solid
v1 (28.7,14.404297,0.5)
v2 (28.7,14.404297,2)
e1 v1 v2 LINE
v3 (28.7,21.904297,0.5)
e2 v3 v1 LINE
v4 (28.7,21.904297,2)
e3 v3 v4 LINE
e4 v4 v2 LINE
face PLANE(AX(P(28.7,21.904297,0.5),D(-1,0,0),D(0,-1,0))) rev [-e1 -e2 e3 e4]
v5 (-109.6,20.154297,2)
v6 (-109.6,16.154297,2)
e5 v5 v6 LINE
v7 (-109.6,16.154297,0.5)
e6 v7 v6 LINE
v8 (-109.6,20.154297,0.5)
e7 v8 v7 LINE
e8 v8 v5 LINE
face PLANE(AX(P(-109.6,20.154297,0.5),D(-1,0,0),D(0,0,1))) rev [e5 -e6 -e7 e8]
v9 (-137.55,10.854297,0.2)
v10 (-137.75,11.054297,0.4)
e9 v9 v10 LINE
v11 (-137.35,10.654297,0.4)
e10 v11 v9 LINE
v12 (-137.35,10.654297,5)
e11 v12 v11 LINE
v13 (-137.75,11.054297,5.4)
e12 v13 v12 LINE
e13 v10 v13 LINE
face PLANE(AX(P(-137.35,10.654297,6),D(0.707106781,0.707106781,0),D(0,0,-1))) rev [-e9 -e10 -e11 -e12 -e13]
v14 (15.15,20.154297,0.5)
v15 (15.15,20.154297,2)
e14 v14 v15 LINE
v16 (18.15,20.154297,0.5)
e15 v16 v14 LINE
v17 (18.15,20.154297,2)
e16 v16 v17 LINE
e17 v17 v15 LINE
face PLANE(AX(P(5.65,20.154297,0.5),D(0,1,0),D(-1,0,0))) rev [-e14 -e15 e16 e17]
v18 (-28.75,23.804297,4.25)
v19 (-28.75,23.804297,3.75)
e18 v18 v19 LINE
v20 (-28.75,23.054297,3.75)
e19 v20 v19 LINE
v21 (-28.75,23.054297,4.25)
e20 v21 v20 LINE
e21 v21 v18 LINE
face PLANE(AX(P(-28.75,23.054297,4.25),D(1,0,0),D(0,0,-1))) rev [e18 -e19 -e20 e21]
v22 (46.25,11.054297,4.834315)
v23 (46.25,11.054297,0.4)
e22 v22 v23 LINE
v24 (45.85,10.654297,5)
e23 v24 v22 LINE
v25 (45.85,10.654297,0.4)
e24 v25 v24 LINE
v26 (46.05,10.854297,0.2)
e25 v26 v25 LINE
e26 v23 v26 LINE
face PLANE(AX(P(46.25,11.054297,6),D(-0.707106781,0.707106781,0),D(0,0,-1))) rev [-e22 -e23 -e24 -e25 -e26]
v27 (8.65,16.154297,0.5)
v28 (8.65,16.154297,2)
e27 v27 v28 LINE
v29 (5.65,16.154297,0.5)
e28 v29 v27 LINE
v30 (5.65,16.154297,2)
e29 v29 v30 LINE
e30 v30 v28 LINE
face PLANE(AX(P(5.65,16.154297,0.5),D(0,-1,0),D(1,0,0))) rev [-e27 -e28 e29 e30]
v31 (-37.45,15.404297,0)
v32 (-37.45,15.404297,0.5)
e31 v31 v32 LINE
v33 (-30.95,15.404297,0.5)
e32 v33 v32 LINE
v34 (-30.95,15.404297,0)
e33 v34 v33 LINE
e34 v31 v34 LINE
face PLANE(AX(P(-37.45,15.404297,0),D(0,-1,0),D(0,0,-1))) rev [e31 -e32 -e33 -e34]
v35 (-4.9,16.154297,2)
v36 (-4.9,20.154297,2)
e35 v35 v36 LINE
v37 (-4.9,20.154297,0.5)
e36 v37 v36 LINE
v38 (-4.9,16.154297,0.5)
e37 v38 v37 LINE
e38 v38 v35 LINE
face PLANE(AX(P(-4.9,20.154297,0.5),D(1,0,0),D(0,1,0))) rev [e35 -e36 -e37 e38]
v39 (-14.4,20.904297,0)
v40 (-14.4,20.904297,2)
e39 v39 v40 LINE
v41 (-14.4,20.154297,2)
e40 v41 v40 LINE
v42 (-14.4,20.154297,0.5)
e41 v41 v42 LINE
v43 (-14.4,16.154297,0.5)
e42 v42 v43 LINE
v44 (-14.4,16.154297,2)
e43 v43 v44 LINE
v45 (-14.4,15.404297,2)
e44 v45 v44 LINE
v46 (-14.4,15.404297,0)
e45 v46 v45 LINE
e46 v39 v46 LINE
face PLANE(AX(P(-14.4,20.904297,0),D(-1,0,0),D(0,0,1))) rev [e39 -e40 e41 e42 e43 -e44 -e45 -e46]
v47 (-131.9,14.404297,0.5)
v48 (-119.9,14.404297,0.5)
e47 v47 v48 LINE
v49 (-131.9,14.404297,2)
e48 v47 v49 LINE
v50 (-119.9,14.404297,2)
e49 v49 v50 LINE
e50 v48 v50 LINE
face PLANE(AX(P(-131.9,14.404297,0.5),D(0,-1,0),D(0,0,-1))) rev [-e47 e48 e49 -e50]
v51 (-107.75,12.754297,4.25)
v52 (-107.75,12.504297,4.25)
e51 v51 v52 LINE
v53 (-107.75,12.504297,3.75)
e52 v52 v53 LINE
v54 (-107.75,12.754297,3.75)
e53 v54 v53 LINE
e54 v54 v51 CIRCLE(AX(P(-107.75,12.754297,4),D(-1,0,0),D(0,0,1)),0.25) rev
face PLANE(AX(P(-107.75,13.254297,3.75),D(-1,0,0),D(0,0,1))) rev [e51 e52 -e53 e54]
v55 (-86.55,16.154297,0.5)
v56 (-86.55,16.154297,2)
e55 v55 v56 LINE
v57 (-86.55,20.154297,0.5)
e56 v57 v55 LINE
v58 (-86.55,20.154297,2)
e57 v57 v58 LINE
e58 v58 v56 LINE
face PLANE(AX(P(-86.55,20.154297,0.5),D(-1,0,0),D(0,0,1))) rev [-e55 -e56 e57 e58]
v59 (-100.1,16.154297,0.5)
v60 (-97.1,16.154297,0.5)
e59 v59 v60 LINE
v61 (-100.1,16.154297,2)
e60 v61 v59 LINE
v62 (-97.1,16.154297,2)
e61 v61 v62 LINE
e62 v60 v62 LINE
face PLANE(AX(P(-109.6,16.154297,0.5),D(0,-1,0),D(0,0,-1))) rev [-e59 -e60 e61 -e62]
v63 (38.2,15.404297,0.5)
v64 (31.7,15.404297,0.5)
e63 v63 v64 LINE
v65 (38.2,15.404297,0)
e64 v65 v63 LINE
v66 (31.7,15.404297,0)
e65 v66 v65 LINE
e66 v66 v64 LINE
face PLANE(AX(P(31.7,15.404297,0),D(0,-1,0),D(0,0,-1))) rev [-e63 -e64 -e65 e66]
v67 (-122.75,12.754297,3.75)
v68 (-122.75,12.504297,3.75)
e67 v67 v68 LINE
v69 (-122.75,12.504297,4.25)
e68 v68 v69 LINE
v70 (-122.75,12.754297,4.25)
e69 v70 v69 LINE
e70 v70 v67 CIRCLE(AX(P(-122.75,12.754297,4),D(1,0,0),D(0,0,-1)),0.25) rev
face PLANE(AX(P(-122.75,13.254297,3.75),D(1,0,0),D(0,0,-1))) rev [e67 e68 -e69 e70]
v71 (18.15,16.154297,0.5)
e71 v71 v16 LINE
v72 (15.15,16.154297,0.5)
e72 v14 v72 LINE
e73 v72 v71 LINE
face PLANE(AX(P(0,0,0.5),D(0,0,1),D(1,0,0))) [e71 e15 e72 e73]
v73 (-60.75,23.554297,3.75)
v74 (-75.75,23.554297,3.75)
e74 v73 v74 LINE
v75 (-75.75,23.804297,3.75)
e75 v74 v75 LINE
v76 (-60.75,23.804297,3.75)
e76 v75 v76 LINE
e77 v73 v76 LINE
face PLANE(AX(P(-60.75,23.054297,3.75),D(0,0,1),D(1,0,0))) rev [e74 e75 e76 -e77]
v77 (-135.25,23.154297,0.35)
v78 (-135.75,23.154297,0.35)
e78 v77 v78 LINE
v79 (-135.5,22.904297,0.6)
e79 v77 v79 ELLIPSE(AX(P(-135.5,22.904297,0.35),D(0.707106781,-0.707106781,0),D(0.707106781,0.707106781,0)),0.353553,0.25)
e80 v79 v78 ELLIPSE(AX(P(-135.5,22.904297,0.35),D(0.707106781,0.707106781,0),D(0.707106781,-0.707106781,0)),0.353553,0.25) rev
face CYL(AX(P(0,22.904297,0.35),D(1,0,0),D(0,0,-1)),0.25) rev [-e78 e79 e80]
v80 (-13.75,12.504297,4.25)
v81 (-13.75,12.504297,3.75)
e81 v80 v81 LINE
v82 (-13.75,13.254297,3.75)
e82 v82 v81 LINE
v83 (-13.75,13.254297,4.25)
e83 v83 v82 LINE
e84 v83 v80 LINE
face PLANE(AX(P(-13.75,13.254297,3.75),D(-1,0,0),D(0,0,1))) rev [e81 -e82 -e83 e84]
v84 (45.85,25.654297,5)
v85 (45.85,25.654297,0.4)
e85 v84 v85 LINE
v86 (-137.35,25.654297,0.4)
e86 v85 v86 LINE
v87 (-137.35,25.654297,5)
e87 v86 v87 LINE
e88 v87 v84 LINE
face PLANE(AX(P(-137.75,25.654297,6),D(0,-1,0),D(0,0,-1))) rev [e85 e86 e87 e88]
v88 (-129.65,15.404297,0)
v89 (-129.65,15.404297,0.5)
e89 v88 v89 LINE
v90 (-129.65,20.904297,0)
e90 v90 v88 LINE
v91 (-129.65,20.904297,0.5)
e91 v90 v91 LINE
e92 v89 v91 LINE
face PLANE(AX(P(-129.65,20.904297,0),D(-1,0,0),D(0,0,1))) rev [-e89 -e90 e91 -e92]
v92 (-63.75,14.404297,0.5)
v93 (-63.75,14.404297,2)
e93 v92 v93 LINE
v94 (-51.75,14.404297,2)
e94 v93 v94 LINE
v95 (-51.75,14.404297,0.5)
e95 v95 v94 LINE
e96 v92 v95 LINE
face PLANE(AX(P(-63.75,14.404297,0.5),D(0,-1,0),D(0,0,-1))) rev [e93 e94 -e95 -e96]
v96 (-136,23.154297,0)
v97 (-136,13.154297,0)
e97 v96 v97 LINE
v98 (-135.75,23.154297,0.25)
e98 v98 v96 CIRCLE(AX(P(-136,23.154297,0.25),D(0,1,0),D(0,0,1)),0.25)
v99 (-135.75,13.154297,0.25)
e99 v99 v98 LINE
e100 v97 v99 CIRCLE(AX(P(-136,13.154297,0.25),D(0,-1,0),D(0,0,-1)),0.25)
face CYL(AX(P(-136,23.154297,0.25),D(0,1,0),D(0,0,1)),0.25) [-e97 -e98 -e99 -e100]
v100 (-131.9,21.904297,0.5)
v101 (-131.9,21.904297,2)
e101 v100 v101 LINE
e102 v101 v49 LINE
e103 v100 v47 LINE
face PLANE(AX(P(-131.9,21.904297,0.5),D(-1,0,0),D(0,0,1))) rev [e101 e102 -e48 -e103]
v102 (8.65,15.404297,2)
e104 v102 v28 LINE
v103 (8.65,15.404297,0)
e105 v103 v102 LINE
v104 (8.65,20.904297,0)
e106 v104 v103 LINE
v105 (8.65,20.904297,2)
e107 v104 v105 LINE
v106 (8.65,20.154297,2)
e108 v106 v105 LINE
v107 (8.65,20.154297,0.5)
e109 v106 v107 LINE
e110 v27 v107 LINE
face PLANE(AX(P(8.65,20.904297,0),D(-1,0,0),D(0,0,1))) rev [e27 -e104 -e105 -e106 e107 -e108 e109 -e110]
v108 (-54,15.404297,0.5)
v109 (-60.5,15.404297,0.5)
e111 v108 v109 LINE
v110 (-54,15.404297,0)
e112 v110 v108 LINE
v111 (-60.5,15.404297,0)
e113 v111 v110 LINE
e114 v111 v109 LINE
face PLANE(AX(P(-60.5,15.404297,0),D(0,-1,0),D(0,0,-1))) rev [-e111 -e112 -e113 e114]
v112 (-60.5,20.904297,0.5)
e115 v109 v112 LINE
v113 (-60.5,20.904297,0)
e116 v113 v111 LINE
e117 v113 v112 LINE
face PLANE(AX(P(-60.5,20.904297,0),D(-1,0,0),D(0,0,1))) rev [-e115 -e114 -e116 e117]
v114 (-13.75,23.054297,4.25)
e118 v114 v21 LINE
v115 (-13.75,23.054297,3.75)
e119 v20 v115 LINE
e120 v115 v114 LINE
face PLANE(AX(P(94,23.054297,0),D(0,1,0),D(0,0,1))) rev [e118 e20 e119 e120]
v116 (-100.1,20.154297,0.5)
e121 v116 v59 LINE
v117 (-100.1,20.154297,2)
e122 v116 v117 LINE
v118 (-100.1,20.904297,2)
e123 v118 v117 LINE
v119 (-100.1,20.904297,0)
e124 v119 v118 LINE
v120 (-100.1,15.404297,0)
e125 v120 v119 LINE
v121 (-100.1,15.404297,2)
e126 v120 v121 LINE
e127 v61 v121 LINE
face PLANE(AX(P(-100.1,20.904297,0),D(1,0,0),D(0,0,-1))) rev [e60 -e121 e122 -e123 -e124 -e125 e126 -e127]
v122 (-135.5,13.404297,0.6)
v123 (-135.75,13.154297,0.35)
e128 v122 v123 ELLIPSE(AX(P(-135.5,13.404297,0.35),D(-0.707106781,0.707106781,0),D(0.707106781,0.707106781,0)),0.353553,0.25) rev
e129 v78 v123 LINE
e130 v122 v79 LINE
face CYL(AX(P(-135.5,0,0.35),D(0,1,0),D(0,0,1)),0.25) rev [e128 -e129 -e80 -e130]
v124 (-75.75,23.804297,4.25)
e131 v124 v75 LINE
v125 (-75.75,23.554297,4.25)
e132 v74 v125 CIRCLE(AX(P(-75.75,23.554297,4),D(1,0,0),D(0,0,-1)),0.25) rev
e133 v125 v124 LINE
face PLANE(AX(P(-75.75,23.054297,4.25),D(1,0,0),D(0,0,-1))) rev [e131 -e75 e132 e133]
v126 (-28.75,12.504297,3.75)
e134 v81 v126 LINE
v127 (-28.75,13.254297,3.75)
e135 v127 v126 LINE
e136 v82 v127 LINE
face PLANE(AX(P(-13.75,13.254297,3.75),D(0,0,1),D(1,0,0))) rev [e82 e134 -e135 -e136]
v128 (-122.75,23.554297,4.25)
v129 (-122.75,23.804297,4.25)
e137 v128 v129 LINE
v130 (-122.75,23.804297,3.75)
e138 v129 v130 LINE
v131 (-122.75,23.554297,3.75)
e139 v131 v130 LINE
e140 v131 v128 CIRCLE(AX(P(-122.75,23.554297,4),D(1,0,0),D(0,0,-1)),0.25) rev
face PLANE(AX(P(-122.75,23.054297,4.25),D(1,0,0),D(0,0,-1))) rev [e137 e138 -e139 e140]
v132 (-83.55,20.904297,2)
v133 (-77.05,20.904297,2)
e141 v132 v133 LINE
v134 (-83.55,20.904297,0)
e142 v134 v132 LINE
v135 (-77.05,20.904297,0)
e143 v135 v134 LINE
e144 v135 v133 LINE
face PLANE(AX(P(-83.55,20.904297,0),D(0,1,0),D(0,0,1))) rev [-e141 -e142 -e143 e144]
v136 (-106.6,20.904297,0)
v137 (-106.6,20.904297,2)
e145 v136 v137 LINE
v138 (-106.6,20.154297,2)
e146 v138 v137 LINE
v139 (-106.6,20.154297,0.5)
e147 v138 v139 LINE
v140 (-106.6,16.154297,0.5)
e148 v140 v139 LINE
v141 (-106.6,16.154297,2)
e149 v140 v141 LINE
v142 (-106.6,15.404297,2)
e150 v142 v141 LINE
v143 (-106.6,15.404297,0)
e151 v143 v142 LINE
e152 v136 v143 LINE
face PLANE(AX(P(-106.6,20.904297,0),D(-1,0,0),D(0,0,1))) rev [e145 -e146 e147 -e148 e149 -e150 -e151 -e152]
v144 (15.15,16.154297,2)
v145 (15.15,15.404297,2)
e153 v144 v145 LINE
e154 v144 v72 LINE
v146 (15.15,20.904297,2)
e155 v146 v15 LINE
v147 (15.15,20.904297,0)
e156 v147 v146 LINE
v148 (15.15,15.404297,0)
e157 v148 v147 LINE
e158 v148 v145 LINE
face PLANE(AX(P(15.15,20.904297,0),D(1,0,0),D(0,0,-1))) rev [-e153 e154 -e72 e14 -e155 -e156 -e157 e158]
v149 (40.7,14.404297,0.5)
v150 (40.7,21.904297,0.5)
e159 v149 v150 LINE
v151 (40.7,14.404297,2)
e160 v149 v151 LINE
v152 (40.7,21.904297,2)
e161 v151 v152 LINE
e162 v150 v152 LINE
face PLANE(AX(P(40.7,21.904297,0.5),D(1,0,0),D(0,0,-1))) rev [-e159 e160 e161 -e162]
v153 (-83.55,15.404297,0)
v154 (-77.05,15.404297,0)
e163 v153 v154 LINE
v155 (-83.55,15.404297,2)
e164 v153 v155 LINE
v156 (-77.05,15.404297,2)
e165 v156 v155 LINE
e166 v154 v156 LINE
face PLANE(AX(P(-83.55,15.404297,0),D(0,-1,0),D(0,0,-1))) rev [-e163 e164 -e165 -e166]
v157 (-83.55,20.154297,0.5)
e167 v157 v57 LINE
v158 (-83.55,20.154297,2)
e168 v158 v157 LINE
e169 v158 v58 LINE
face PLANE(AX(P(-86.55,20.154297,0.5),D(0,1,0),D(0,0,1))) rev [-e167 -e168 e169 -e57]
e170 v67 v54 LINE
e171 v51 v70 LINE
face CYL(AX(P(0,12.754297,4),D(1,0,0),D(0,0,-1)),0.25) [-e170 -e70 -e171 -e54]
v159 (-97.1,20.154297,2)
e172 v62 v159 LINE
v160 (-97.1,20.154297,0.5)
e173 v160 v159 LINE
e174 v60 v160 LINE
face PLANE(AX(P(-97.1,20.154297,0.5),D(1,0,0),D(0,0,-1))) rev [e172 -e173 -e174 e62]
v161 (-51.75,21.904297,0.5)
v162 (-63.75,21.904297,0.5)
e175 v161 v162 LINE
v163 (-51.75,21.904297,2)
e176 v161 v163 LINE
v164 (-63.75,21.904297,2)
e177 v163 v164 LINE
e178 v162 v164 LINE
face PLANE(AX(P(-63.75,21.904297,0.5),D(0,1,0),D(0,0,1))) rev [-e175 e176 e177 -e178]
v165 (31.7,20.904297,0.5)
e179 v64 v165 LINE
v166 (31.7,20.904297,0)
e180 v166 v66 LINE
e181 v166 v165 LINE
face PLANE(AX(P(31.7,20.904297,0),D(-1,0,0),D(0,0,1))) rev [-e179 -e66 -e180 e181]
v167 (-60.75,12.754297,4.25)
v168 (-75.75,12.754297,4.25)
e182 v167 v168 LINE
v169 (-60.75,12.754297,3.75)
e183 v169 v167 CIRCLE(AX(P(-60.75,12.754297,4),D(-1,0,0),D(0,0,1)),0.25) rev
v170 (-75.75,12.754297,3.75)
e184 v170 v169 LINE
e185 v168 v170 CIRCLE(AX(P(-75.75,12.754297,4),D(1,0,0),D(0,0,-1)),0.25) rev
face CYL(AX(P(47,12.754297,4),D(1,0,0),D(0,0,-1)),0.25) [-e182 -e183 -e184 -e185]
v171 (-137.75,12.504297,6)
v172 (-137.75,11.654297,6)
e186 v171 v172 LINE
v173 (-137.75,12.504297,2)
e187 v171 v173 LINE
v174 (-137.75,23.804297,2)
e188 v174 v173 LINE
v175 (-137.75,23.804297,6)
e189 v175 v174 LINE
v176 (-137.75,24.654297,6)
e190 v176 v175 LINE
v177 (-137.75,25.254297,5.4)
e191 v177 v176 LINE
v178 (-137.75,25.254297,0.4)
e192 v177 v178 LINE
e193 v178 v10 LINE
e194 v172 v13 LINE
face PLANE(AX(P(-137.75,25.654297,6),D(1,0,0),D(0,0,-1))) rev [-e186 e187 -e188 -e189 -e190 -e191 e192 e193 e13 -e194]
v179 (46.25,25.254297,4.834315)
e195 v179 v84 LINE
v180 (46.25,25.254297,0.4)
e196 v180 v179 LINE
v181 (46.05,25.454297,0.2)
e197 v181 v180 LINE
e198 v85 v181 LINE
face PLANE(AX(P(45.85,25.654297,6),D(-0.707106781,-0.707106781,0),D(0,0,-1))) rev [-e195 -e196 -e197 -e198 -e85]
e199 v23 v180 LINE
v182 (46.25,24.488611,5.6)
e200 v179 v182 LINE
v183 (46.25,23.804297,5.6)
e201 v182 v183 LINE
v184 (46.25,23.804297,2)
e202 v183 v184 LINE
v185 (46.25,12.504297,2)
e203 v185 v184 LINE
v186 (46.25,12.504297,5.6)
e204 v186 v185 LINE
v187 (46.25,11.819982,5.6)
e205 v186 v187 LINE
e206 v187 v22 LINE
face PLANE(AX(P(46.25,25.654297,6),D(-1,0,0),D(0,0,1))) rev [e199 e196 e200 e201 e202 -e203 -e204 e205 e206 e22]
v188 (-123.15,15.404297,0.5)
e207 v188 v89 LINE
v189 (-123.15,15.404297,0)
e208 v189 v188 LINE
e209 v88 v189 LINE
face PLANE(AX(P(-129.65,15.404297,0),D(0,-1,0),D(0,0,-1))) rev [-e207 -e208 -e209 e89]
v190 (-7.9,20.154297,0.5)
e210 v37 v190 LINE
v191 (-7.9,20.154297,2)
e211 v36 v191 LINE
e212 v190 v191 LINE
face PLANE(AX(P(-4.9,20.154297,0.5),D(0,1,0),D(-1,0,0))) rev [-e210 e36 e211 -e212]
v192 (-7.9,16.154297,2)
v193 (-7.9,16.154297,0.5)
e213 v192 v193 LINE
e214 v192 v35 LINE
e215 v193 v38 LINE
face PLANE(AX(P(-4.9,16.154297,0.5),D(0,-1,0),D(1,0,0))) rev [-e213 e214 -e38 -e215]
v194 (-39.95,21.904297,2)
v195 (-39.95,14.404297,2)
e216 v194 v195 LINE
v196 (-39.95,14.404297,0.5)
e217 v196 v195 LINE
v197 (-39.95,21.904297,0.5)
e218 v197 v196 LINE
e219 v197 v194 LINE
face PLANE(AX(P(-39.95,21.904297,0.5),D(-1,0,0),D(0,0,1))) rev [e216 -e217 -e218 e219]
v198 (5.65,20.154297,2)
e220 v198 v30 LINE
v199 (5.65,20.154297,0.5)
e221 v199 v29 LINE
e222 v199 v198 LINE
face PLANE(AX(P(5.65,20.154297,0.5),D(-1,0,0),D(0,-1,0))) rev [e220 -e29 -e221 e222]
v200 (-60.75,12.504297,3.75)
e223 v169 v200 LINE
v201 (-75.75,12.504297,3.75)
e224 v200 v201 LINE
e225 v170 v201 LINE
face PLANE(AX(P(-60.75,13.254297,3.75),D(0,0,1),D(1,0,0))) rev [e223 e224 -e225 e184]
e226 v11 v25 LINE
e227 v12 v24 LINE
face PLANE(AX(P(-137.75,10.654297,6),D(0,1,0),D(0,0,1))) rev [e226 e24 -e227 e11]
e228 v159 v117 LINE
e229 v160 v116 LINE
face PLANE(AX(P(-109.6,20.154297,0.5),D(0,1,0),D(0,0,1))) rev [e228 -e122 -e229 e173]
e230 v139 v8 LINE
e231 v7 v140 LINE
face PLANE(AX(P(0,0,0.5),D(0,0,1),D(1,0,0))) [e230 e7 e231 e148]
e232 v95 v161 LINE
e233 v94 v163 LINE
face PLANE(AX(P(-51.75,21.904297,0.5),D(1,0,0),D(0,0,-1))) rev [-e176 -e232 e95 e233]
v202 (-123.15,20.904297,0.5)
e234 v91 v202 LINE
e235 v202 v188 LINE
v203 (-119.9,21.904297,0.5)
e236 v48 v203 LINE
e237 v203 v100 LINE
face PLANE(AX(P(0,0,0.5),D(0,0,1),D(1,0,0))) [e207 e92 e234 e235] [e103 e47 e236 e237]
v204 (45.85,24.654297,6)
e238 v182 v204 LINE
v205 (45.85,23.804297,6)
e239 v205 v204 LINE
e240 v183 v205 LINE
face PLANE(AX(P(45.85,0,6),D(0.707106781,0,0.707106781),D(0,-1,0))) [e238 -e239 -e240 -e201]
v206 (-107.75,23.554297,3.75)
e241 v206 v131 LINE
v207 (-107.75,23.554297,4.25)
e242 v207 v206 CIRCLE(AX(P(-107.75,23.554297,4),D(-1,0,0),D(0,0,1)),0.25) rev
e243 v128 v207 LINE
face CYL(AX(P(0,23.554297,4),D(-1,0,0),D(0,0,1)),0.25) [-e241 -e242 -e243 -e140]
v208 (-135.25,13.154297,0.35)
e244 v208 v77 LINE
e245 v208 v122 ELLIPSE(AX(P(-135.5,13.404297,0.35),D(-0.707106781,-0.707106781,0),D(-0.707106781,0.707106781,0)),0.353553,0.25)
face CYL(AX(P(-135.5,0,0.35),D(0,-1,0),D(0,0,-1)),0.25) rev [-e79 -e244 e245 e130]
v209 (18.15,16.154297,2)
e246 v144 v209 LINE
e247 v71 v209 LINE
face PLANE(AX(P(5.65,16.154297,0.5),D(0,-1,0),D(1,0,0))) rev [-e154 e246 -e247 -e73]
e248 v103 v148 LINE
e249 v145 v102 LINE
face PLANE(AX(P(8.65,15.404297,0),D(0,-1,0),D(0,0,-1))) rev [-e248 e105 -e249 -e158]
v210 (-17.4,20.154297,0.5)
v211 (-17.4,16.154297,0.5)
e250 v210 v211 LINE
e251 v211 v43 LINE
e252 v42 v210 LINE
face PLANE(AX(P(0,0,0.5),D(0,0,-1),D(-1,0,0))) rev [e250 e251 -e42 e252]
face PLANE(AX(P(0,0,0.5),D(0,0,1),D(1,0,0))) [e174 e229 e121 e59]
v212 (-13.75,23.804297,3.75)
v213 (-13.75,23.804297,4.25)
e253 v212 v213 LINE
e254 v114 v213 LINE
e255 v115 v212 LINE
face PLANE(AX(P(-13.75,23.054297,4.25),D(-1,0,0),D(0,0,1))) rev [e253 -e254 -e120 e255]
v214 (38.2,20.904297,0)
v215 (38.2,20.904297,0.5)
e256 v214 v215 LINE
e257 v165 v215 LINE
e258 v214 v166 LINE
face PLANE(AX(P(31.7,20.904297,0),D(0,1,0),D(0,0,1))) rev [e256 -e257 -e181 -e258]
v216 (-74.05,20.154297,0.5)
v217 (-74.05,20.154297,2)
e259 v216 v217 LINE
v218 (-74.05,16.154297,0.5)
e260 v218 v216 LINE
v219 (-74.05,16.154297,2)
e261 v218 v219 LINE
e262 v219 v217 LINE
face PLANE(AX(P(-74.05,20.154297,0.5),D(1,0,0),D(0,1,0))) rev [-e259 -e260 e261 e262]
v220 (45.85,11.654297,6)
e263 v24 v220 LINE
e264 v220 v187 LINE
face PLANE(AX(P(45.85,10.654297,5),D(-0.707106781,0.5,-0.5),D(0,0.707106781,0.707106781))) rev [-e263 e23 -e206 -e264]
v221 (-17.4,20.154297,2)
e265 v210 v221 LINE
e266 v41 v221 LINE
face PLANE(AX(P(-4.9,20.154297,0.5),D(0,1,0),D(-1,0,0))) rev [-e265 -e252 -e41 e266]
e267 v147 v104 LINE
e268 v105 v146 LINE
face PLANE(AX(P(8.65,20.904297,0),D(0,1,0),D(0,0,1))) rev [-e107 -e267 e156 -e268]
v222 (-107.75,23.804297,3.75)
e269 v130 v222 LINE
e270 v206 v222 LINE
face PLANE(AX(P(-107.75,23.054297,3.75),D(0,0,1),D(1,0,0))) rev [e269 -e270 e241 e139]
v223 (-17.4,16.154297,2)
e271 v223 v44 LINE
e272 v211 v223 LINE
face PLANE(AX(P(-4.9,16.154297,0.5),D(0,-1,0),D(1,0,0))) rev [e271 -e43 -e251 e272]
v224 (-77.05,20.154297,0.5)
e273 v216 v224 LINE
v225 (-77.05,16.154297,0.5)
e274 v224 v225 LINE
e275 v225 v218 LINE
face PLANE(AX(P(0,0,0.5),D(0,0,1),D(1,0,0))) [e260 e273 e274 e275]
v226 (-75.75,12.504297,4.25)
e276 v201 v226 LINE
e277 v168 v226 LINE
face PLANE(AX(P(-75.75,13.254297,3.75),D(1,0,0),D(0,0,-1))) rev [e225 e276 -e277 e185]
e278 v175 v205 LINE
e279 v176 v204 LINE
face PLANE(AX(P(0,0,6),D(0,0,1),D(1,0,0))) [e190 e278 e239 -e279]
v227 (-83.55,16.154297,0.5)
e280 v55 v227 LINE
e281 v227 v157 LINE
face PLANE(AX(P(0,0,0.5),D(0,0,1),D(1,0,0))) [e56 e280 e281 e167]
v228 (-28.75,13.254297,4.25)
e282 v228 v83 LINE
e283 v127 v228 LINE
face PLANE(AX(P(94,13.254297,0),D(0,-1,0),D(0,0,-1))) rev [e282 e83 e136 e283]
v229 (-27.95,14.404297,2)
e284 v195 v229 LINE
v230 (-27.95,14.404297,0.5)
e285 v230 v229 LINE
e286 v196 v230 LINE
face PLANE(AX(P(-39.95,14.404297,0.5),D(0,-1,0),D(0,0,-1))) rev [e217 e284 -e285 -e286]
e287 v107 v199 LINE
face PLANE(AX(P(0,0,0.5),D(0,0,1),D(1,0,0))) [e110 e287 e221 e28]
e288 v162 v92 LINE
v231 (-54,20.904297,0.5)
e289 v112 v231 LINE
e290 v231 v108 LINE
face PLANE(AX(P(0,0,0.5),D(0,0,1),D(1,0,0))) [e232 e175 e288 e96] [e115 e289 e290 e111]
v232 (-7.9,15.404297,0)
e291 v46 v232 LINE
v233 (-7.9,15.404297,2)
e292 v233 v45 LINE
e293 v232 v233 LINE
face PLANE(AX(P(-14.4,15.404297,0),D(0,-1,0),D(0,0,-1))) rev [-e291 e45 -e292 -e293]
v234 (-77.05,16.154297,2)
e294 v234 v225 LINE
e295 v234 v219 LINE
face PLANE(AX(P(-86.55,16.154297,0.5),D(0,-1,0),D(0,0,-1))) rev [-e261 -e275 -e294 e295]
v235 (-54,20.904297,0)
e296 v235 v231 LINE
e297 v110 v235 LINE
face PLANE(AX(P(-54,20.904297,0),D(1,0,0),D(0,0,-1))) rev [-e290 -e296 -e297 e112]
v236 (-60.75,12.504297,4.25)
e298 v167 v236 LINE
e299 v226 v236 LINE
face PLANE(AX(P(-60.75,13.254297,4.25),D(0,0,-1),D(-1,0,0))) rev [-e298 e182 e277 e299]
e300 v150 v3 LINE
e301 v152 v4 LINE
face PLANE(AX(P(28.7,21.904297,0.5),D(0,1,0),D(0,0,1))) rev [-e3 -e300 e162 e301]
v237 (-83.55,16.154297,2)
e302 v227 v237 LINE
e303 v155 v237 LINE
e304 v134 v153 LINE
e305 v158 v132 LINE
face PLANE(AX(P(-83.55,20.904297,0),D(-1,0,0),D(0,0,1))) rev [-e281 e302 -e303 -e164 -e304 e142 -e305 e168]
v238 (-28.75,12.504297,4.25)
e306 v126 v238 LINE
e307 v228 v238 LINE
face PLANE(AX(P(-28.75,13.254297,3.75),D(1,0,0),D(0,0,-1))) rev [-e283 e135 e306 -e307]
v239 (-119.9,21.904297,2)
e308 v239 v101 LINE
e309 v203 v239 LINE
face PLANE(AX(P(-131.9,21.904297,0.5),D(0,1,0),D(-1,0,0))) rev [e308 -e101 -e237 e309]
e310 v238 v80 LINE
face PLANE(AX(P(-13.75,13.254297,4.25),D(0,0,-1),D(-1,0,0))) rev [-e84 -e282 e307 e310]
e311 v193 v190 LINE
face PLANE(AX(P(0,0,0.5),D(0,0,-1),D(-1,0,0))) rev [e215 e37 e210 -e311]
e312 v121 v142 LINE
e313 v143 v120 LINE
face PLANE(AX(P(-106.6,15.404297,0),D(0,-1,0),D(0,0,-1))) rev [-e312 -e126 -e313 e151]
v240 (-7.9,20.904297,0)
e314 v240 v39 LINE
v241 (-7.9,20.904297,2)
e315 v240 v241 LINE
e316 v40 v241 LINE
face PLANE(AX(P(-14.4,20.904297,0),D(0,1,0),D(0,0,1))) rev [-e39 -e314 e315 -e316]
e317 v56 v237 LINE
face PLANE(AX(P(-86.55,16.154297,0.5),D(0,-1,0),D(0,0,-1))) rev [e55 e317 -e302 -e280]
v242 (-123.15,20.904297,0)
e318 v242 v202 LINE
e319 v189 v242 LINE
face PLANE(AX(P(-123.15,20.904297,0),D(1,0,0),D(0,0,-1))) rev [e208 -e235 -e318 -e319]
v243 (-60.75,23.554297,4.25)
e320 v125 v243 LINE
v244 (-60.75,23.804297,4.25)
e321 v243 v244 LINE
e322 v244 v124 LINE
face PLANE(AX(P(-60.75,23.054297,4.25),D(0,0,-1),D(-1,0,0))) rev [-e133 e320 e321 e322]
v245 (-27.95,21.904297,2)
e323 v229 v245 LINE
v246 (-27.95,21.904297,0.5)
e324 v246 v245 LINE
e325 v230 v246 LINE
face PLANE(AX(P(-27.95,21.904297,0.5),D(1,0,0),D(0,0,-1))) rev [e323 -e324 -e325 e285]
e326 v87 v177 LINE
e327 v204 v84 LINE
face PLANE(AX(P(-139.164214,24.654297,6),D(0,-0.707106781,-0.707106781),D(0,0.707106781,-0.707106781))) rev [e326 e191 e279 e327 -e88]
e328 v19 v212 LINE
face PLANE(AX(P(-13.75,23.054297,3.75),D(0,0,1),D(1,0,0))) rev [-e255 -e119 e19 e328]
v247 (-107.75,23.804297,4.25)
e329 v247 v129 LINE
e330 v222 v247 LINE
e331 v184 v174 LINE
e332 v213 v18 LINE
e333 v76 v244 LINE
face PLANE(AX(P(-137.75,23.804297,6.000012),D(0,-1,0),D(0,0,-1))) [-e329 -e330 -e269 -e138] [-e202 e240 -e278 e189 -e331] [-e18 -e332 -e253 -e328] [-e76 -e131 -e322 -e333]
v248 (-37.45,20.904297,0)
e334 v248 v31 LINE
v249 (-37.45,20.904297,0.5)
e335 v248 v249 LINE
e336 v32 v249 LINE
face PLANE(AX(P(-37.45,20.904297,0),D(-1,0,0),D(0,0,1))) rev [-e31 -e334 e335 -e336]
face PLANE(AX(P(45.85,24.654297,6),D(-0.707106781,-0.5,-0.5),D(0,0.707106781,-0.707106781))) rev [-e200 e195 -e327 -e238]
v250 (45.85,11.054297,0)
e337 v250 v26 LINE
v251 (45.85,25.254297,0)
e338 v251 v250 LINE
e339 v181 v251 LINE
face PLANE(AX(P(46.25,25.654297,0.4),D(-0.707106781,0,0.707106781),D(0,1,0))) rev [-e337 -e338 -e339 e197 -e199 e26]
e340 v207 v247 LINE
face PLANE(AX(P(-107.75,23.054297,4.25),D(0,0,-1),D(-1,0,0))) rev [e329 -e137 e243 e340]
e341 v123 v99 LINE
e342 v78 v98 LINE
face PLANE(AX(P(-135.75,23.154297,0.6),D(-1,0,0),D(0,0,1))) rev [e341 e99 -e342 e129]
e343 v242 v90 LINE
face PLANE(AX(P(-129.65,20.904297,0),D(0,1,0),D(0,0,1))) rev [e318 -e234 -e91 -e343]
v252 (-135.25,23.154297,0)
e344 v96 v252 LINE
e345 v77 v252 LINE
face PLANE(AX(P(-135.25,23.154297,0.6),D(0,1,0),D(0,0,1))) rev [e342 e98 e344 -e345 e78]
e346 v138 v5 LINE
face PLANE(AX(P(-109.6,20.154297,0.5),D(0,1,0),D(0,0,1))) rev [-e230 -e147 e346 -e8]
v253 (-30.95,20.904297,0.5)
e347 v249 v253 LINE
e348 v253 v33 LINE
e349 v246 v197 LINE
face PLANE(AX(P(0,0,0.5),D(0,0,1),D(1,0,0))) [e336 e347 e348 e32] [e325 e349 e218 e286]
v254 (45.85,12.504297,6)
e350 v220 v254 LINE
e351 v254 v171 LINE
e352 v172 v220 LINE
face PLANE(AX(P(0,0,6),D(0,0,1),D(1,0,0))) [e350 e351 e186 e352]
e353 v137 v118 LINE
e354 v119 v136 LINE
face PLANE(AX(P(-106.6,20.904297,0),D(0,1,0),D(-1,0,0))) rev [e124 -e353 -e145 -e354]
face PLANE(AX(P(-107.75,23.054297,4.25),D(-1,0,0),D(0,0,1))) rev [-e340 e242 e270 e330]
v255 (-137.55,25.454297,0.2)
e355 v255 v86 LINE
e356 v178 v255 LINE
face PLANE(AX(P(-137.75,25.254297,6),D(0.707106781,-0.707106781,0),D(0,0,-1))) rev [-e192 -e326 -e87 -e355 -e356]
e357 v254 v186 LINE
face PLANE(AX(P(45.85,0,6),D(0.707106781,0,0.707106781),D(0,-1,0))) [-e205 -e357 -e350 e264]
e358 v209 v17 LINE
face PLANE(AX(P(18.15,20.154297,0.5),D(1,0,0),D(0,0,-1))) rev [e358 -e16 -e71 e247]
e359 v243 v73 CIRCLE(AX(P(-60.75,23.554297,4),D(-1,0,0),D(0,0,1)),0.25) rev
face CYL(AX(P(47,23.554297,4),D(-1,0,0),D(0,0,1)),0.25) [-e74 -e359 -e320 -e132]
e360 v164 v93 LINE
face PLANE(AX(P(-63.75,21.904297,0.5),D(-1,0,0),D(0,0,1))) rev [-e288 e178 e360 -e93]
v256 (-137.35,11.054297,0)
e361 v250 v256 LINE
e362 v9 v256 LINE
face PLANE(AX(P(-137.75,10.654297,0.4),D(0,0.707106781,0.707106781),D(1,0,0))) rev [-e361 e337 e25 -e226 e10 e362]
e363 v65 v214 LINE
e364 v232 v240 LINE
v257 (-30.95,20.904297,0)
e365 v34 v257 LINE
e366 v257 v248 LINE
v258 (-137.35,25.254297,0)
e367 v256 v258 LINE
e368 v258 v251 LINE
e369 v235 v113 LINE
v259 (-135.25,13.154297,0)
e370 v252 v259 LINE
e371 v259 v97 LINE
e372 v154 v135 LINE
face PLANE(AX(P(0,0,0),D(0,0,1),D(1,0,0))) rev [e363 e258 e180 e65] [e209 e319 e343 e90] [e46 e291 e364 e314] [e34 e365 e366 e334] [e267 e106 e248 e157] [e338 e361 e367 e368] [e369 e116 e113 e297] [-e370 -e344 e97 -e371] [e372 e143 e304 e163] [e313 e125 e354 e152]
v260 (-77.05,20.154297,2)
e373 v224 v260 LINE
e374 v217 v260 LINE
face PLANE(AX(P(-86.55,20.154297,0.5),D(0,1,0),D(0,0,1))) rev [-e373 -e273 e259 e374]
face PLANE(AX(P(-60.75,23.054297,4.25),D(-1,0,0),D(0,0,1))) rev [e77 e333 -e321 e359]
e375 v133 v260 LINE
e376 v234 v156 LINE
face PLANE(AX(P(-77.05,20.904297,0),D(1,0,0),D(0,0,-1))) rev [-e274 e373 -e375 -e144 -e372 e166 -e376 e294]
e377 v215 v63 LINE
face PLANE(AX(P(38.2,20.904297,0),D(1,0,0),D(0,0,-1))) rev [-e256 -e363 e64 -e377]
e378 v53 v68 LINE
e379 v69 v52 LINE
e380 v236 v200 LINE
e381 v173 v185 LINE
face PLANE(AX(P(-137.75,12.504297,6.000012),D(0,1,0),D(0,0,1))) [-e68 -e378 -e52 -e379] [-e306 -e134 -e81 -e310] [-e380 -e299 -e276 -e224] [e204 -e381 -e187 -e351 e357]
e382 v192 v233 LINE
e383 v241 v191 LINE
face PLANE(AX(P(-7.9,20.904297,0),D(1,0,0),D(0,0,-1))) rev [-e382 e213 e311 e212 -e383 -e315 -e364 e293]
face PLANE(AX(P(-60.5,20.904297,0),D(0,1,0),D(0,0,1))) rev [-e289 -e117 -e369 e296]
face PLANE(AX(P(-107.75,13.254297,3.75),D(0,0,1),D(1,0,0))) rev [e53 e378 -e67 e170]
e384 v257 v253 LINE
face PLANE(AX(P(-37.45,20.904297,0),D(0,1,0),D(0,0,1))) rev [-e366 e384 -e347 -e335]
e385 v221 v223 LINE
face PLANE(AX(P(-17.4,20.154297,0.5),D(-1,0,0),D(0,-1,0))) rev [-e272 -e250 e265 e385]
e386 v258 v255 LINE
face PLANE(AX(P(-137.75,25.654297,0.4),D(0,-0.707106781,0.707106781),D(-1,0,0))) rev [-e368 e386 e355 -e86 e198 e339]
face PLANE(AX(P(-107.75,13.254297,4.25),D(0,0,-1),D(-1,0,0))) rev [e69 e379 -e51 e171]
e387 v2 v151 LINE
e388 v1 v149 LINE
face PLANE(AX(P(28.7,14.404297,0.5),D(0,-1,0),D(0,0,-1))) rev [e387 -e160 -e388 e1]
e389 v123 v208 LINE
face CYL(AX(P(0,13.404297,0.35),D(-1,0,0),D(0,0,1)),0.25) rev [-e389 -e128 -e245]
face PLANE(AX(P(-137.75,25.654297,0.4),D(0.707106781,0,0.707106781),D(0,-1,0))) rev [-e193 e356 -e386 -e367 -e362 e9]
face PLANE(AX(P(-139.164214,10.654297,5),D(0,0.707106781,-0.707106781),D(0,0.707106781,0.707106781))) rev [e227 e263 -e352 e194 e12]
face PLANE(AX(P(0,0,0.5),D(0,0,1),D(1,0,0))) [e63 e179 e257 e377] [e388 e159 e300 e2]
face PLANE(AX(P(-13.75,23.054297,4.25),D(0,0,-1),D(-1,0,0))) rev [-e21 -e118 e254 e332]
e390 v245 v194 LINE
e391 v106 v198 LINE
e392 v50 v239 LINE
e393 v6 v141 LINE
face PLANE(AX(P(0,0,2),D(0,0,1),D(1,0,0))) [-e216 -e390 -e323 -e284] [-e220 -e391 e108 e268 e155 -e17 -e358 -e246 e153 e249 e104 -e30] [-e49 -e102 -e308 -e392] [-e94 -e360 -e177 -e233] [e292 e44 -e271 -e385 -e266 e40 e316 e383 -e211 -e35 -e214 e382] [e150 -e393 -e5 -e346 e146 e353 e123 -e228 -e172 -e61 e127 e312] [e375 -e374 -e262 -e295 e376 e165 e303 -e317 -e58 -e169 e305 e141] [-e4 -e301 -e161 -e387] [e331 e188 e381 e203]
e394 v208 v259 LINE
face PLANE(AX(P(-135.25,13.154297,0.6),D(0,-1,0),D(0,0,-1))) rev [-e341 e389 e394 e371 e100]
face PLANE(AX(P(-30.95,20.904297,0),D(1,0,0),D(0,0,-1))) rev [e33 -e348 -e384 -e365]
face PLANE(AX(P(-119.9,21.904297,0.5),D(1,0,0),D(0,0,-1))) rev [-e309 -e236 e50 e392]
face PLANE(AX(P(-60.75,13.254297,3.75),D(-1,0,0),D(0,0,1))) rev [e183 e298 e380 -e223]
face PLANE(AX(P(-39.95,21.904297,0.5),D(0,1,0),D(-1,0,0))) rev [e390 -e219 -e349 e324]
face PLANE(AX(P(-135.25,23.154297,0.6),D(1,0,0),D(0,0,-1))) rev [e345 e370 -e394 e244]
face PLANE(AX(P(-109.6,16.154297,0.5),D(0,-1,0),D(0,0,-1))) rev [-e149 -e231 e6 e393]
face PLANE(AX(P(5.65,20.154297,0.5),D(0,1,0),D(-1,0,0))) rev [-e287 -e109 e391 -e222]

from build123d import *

# Parameters (mm, degrees)
SKETCH1_W               = 184
SKETCH1_H               = 15
BOSS_EXTRUDE1_DEPTH     = 6
CUT_EXTRUDE1_DEPTH      = 141.246944523
CUT_EXTRUDE1_DEPTH_BACK = 141.246944523
SKETCH2_W               = 6.5
SKETCH2_H               = 5.5
CUT_EXTRUDE2_DEPTH      = 141.246944523
CUT_EXTRUDE2_DEPTH_BACK = 141.246944523
SKETCH3_W               = 6.5
SKETCH3_H               = 5.5
CUT_EXTRUDE3_DEPTH      = 141.246944523
CUT_EXTRUDE3_DEPTH_BACK = 141.246944523
SKETCH4_W               = 6.5
SKETCH4_H               = 5.5
CUT_EXTRUDE4_DEPTH      = 141.246944523
CUT_EXTRUDE4_DEPTH_BACK = 141.246944523
SKETCH5_W               = 6.5
SKETCH5_H               = 5.5
CUT_EXTRUDE5_DEPTH      = 141.246944523
CUT_EXTRUDE5_DEPTH_BACK = 4
SKETCH8_W               = 184
SKETCH8_H               = 11.3
SKETCH9_W               = 12
SKETCH9_H               = 7.5
SKETCH9_W_2             = 12.5
SKETCH9_H_2             = 4
CUT_EXTRUDE6_DEPTH      = 1.5
SKETCH10_W              = 12.5
SKETCH10_H              = 4
CUT_EXTRUDE7_DEPTH      = 1.5
CUT_EXTRUDE8_DEPTH      = 184
SKETCH13_W              = 0.5
SKETCH13_H              = 10
CUT_EXTRUDE9_DEPTH      = 0.6
FILLET1_R               = 0.25
FILLET2_R               = 0.25
SKETCH16_W              = 15
SKETCH16_H              = 0.5
BOSS_EXTRUDE2_DEPTH     = 0.75
FILLET3_R               = 0.5
FILLET4_R               = 0.25
SKETCH17_W              = 15
SKETCH17_H              = 0.5
BOSS_EXTRUDE3_DEPTH     = 0.75
FILLET5_R               = 0.5
FILLET6_R               = 0.25
LPATTERN1_COUNT         = 3
LPATTERN1_PITCH         = 47
LPATTERN2_COUNT         = 3
LPATTERN2_PITCH         = 47
FILLET7_R               = 0.5
FILLET8_R               = 0.25
FILLET9_R               = 0.5
FILLET10_R              = 0.25
CHAMFER1_SIZE           = 0.4
CHAMFER2_SIZE           = 0.4
CHAMFER3_SIZE           = 0.4
CHAMFER5_SIZE           = 0.4


# Some blends are built 0.0001 mm under size
with BuildPart() as part:
    # Sketch1 → Boss-Extrude1 (new body)
    with BuildSketch(Plane.XY):
        with Locations((-45.75, 18.154296875)):
            Rectangle(SKETCH1_W, SKETCH1_H)
    extrude(amount=BOSS_EXTRUDE1_DEPTH)

    # Sketch2 → Cut-Extrude1 (cut, two sides: drawn at the far end of the back side and taken through both)
    with BuildSketch(Plane.XY.offset(6).offset(-CUT_EXTRUDE1_DEPTH_BACK)):
        with Locations((-126.4, 18.154296875)):
            Rectangle(SKETCH2_W, SKETCH2_H)
    extrude(amount=CUT_EXTRUDE1_DEPTH + CUT_EXTRUDE1_DEPTH_BACK, mode=Mode.SUBTRACT)

    # Sketch3 → Cut-Extrude2 (cut, two sides: drawn at the far end of the back side and taken through both)
    with BuildSketch(Plane.XY.offset(6).offset(-CUT_EXTRUDE2_DEPTH_BACK)):
        with Locations((-103.35, 18.154296875)):
            Rectangle(SKETCH3_W, SKETCH3_H)
    extrude(amount=CUT_EXTRUDE2_DEPTH + CUT_EXTRUDE2_DEPTH_BACK, mode=Mode.SUBTRACT)

    # Sketch4 → Cut-Extrude3 (cut, two sides: drawn at the far end of the back side and taken through both)
    with BuildSketch(Plane.XY.offset(6).offset(-CUT_EXTRUDE3_DEPTH_BACK)):
        with Locations((-80.3, 18.154296875)):
            Rectangle(SKETCH4_W, SKETCH4_H)
    extrude(amount=CUT_EXTRUDE3_DEPTH + CUT_EXTRUDE3_DEPTH_BACK, mode=Mode.SUBTRACT)

    # Sketch5 → Cut-Extrude4 (cut, two sides: drawn at the far end of the back side and taken through both)
    with BuildSketch(Plane.XY.offset(6).offset(-CUT_EXTRUDE4_DEPTH_BACK)):
        with Locations((-57.25, 18.154296875)):
            Rectangle(SKETCH5_W, SKETCH5_H)
        with Locations((-34.2, 18.154296875)):
            Rectangle(SKETCH5_W, SKETCH5_H)
        with Locations((-11.15, 18.154296875)):
            Rectangle(SKETCH5_W, SKETCH5_H)
        with Locations((11.9, 18.154296875)):
            Rectangle(SKETCH5_W, SKETCH5_H)
        with Locations((34.95, 18.154296875)):
            Rectangle(SKETCH5_W, SKETCH5_H)
    extrude(amount=CUT_EXTRUDE4_DEPTH + CUT_EXTRUDE4_DEPTH_BACK, mode=Mode.SUBTRACT)

    # Sketch8 → Cut-Extrude5 (cut, two sides: drawn at the far end of the back side and taken through both)
    with BuildSketch(Plane.XY.offset(6).offset(-CUT_EXTRUDE5_DEPTH_BACK)):
        with Locations((-45.75, 18.154296875)):
            Rectangle(SKETCH8_W, SKETCH8_H)
    extrude(amount=CUT_EXTRUDE5_DEPTH + CUT_EXTRUDE5_DEPTH_BACK, mode=Mode.SUBTRACT)

    # Sketch9 → Cut-Extrude6 (cut)
    with BuildSketch(Plane.XY.offset(2)):
        with Locations((-57.75, 18.154296875)):
            Rectangle(SKETCH9_W, SKETCH9_H)
        with Locations((-33.95, 18.154296875)):
            Rectangle(SKETCH9_W, SKETCH9_H)
        with Locations((-125.9, 18.154296875)):
            Rectangle(SKETCH9_W, SKETCH9_H)
        with Locations((-11.15, 18.154296875)):
            Rectangle(SKETCH9_W_2, SKETCH9_H_2)
        with Locations((11.9, 18.154296875)):
            Rectangle(SKETCH9_W_2, SKETCH9_H_2)
        with Locations((34.7, 18.154296875)):
            Rectangle(SKETCH9_W, SKETCH9_H)
    extrude(amount=-CUT_EXTRUDE6_DEPTH, mode=Mode.SUBTRACT)

    # Sketch10 → Cut-Extrude7 (cut)
    with BuildSketch(Plane.XY.offset(2)):
        with Locations((-80.3, 18.154296875)):
            Rectangle(SKETCH10_W, SKETCH10_H)
        with Locations((-103.35, 18.154296875)):
            Rectangle(SKETCH10_W, SKETCH10_H)
    extrude(amount=-CUT_EXTRUDE7_DEPTH, mode=Mode.SUBTRACT)

    # Sketch12 → Cut-Extrude8 (cut)
    with BuildSketch(Plane(origin=(46.25, 0, 0), x_dir=(0, 0, -1), z_dir=(1, 0, 0))):
        Polygon((-6, 25.654296875), (-6, 24.654296875), (-5, 25.654296875), align=None)
        Polygon((-6, 10.654296875), (-5, 10.654296875), (-6, 11.654296875), align=None)
    extrude(amount=-CUT_EXTRUDE8_DEPTH, mode=Mode.SUBTRACT)

    # Sketch13 → Cut-Extrude9 (cut)
    with BuildSketch(Plane(origin=(0, 0, 0), x_dir=(-1, 0, 0), z_dir=(0, 0, -1))):
        with Locations((135.5, 18.154296875)):
            Rectangle(SKETCH13_W, SKETCH13_H)
    extrude(amount=-CUT_EXTRUDE9_DEPTH, mode=Mode.SUBTRACT)

    # Fillet1
    fillet1_edges = [part.edges().sort_by_distance(p)[0] for p in [
        (-135.75, 18.154296875, 0),
    ]]
    fillet(fillet1_edges, radius=FILLET1_R)

    # Fillet2
    fillet2_edges = [part.edges().sort_by_distance(p)[0] for p in [
        (-135.25, 18.154296875, 0.6),
        (-135.5, 23.154296875, 0.6),
        (-135.75, 18.154296875, 0.6),
        (-135.5, 13.154296875, 0.6),
    ]]
    fillet(fillet2_edges, radius=FILLET2_R - 0.0001)  # a hair under: the kernel refuses the full size

    # Sketch16 → Boss-Extrude2 (add)
    with BuildSketch(Plane.XZ.offset(-23.804296875)):
        with Locations((-115.25, 4)):
            Rectangle(SKETCH16_W, SKETCH16_H)
    boss_extrude2 = extrude(amount=BOSS_EXTRUDE2_DEPTH)

    # Fillet3
    fillet3_edges = [part.edges().sort_by_distance(p)[0] for p in [
        (-115.25, 23.054296875, 4.25),
    ]]
    fillet(fillet3_edges, radius=FILLET3_R - 0.0001)  # a hair under: the kernel refuses the full size

    # Fillet4
    # the kernel refuses this fillet: 0.25 mm, written as the material it takes off along each edge
    with BuildSketch(Plane(origin=(-124.517583763, 23.054296875, 3.75), x_dir=(0, 0.7070334884245003, 0.7071800663524687), z_dir=(1, 0, 0))) as fillet4_piece_1:
        with BuildLine():
            CenterArc((0.530239772, -0.176759658), FILLET4_R, 44.994478191, 179.999583317)
            Line((0.353444756, -0.35351803), (0.335765254, -0.371193867))
            Line((0.335765254, -0.371193867), (-0.017679502, -0.017675837))
            Line((-0.017679502, -0.017675837), (-0.017675837, 0.017679502))
            ThreePointArc((-0.017675837, 0.017679502), (-0.017605119, 0.017750205), (0.724712877, 0.017675966))
            Line((0.724712877, 0.017675966), (0.707033504, 0))
        make_face()
    extrude(amount=18.535167526, mode=Mode.SUBTRACT)

    # Sketch17 → Boss-Extrude3 (add)
    with BuildSketch(Plane(origin=(0, 12.504296875, 0), x_dir=(1, 0, 0), z_dir=(0, 1, 0))):
        with Locations((-115.25, -4)):
            Rectangle(SKETCH17_W, SKETCH17_H)
    boss_extrude3 = extrude(amount=BOSS_EXTRUDE3_DEPTH)

    # Fillet5
    fillet5_edges = [part.edges().sort_by_distance(p)[0] for p in [
        (-115.25, 13.254296875, 4.25),
    ]]
    fillet(fillet5_edges, radius=FILLET5_R - 0.0001)  # a hair under: the kernel refuses the full size

    # Fillet6
    # the kernel refuses this fillet: 0.25 mm, written as the material it takes off along each edge
    with BuildSketch(Plane(origin=(-105.982416233, 13.254296875, 3.75), x_dir=(0, -0.7070334900459336, 0.7071800647313715), z_dir=(-1, 0, 0))) as fillet6_piece_1:
        with BuildLine():
            CenterArc((0.530239774, -0.176759657), FILLET6_R, 44.994478059, 179.99958358)
            Line((0.353444758, -0.35351803), (0.335765256, -0.371193867))
            Line((0.335765256, -0.371193867), (-0.017679502, -0.017675837))
            Line((-0.017679502, -0.017675837), (-0.017675837, 0.017679502))
            ThreePointArc((-0.017675837, 0.017679502), (-0.017605119, 0.017750205), (0.724712878, 0.017675966))
            Line((0.724712878, 0.017675966), (0.707033505, 0))
        make_face()
    extrude(amount=18.535167534, mode=Mode.SUBTRACT)

    # LPattern1: Boss-Extrude3 ×3
    with Locations(*[(i * LPATTERN1_PITCH, 0, 0) for i in range(1, LPATTERN1_COUNT)]):
        add(boss_extrude3)

    # LPattern2: Boss-Extrude2 ×3
    with Locations(*[(i * LPATTERN2_PITCH, 0, 0) for i in range(1, LPATTERN2_COUNT)]):
        add(boss_extrude2)

    # Fillet7
    fillet7_edges = [part.edges().sort_by_distance(p)[0] for p in [
        (-68.25, 23.054296875, 4.25),
    ]]
    fillet(fillet7_edges, radius=FILLET7_R - 0.0001)  # a hair under: the kernel refuses the full size

    # Fillet8
    # the kernel refuses this fillet: 0.25 mm, written as the material it takes off along each edge
    with BuildSketch(Plane(origin=(-77.517583763, 23.054296875, 3.75), x_dir=(0, 0.7070334884245003, 0.7071800663524687), z_dir=(1, 0, 0))) as fillet8_piece_1:
        with BuildLine():
            CenterArc((0.530239772, -0.176759658), FILLET8_R, 44.994478191, 179.999583317)
            Line((0.353444756, -0.35351803), (0.335765254, -0.371193867))
            Line((0.335765254, -0.371193867), (-0.017679502, -0.017675837))
            Line((-0.017679502, -0.017675837), (-0.017675837, 0.017679502))
            ThreePointArc((-0.017675837, 0.017679502), (-0.017605119, 0.017750205), (0.724712877, 0.017675966))
            Line((0.724712877, 0.017675966), (0.707033504, 0))
        make_face()
    extrude(amount=18.535167526, mode=Mode.SUBTRACT)

    # Fillet9
    fillet9_edges = [part.edges().sort_by_distance(p)[0] for p in [
        (-68.25, 13.254296875, 4.25),
    ]]
    fillet(fillet9_edges, radius=FILLET9_R - 0.0001)  # a hair under: the kernel refuses the full size

    # Fillet10
    # the kernel refuses this fillet: 0.25 mm, written as the material it takes off along each edge
    with BuildSketch(Plane(origin=(-58.982416233, 13.254296875, 3.75), x_dir=(0, -0.7070334916347167, 0.7071800631429177), z_dir=(-1, 0, 0))) as fillet10_piece_1:
        with BuildLine():
            CenterArc((0.530239775, -0.176759657), FILLET10_R, 44.994477931, 179.999583837)
            Line((0.353444759, -0.35351803), (0.335765258, -0.371193867))
            Line((0.335765258, -0.371193867), (-0.017679502, -0.017675837))
            Line((-0.017679502, -0.017675837), (-0.017675837, 0.017679502))
            ThreePointArc((-0.017675837, 0.017679502), (-0.017605119, 0.017750205), (0.72471288, 0.017675966))
            Line((0.72471288, 0.017675966), (0.707033507, 0))
        make_face()
    extrude(amount=18.535167534, mode=Mode.SUBTRACT)

    # Chamfer1
    chamfer1_edges = [part.edges().sort_by_distance(p)[0] for p in [
        (-45.75, 25.654296875, 0),
        (-45.75, 10.654296875, 0),
    ]]
    chamfer(chamfer1_edges, length=CHAMFER1_SIZE)

    # Chamfer2
    chamfer2_edges = [part.edges().sort_by_distance(p)[0] for p in [
        (46.25, 18.154296875, 0),
        (-137.75, 18.154296875, 0),
    ]]
    chamfer(chamfer2_edges, length=CHAMFER2_SIZE)

    # Chamfer3
    chamfer3_edges = [part.edges().sort_by_distance(p)[0] for p in [
        (-137.75, 25.654296875, 2.7),
        (-137.75, 10.654296875, 2.7),
    ]]
    chamfer(chamfer3_edges, length=CHAMFER3_SIZE)

    # Chamfer5
    chamfer5_edges = [part.edges().sort_by_distance(p)[0] for p in [
        (46.25, 24.229296875, 6),
        (46.25, 25.654296875, 2.7),
        (46.25, 10.654296875, 2.7),
        (46.25, 12.079296875, 6),
        (46.25, 25.154296875, 5.5),
        (46.25, 11.154296875, 5.5),
    ]]
    chamfer(chamfer5_edges, length=CHAMFER5_SIZE)


solid = part.part
